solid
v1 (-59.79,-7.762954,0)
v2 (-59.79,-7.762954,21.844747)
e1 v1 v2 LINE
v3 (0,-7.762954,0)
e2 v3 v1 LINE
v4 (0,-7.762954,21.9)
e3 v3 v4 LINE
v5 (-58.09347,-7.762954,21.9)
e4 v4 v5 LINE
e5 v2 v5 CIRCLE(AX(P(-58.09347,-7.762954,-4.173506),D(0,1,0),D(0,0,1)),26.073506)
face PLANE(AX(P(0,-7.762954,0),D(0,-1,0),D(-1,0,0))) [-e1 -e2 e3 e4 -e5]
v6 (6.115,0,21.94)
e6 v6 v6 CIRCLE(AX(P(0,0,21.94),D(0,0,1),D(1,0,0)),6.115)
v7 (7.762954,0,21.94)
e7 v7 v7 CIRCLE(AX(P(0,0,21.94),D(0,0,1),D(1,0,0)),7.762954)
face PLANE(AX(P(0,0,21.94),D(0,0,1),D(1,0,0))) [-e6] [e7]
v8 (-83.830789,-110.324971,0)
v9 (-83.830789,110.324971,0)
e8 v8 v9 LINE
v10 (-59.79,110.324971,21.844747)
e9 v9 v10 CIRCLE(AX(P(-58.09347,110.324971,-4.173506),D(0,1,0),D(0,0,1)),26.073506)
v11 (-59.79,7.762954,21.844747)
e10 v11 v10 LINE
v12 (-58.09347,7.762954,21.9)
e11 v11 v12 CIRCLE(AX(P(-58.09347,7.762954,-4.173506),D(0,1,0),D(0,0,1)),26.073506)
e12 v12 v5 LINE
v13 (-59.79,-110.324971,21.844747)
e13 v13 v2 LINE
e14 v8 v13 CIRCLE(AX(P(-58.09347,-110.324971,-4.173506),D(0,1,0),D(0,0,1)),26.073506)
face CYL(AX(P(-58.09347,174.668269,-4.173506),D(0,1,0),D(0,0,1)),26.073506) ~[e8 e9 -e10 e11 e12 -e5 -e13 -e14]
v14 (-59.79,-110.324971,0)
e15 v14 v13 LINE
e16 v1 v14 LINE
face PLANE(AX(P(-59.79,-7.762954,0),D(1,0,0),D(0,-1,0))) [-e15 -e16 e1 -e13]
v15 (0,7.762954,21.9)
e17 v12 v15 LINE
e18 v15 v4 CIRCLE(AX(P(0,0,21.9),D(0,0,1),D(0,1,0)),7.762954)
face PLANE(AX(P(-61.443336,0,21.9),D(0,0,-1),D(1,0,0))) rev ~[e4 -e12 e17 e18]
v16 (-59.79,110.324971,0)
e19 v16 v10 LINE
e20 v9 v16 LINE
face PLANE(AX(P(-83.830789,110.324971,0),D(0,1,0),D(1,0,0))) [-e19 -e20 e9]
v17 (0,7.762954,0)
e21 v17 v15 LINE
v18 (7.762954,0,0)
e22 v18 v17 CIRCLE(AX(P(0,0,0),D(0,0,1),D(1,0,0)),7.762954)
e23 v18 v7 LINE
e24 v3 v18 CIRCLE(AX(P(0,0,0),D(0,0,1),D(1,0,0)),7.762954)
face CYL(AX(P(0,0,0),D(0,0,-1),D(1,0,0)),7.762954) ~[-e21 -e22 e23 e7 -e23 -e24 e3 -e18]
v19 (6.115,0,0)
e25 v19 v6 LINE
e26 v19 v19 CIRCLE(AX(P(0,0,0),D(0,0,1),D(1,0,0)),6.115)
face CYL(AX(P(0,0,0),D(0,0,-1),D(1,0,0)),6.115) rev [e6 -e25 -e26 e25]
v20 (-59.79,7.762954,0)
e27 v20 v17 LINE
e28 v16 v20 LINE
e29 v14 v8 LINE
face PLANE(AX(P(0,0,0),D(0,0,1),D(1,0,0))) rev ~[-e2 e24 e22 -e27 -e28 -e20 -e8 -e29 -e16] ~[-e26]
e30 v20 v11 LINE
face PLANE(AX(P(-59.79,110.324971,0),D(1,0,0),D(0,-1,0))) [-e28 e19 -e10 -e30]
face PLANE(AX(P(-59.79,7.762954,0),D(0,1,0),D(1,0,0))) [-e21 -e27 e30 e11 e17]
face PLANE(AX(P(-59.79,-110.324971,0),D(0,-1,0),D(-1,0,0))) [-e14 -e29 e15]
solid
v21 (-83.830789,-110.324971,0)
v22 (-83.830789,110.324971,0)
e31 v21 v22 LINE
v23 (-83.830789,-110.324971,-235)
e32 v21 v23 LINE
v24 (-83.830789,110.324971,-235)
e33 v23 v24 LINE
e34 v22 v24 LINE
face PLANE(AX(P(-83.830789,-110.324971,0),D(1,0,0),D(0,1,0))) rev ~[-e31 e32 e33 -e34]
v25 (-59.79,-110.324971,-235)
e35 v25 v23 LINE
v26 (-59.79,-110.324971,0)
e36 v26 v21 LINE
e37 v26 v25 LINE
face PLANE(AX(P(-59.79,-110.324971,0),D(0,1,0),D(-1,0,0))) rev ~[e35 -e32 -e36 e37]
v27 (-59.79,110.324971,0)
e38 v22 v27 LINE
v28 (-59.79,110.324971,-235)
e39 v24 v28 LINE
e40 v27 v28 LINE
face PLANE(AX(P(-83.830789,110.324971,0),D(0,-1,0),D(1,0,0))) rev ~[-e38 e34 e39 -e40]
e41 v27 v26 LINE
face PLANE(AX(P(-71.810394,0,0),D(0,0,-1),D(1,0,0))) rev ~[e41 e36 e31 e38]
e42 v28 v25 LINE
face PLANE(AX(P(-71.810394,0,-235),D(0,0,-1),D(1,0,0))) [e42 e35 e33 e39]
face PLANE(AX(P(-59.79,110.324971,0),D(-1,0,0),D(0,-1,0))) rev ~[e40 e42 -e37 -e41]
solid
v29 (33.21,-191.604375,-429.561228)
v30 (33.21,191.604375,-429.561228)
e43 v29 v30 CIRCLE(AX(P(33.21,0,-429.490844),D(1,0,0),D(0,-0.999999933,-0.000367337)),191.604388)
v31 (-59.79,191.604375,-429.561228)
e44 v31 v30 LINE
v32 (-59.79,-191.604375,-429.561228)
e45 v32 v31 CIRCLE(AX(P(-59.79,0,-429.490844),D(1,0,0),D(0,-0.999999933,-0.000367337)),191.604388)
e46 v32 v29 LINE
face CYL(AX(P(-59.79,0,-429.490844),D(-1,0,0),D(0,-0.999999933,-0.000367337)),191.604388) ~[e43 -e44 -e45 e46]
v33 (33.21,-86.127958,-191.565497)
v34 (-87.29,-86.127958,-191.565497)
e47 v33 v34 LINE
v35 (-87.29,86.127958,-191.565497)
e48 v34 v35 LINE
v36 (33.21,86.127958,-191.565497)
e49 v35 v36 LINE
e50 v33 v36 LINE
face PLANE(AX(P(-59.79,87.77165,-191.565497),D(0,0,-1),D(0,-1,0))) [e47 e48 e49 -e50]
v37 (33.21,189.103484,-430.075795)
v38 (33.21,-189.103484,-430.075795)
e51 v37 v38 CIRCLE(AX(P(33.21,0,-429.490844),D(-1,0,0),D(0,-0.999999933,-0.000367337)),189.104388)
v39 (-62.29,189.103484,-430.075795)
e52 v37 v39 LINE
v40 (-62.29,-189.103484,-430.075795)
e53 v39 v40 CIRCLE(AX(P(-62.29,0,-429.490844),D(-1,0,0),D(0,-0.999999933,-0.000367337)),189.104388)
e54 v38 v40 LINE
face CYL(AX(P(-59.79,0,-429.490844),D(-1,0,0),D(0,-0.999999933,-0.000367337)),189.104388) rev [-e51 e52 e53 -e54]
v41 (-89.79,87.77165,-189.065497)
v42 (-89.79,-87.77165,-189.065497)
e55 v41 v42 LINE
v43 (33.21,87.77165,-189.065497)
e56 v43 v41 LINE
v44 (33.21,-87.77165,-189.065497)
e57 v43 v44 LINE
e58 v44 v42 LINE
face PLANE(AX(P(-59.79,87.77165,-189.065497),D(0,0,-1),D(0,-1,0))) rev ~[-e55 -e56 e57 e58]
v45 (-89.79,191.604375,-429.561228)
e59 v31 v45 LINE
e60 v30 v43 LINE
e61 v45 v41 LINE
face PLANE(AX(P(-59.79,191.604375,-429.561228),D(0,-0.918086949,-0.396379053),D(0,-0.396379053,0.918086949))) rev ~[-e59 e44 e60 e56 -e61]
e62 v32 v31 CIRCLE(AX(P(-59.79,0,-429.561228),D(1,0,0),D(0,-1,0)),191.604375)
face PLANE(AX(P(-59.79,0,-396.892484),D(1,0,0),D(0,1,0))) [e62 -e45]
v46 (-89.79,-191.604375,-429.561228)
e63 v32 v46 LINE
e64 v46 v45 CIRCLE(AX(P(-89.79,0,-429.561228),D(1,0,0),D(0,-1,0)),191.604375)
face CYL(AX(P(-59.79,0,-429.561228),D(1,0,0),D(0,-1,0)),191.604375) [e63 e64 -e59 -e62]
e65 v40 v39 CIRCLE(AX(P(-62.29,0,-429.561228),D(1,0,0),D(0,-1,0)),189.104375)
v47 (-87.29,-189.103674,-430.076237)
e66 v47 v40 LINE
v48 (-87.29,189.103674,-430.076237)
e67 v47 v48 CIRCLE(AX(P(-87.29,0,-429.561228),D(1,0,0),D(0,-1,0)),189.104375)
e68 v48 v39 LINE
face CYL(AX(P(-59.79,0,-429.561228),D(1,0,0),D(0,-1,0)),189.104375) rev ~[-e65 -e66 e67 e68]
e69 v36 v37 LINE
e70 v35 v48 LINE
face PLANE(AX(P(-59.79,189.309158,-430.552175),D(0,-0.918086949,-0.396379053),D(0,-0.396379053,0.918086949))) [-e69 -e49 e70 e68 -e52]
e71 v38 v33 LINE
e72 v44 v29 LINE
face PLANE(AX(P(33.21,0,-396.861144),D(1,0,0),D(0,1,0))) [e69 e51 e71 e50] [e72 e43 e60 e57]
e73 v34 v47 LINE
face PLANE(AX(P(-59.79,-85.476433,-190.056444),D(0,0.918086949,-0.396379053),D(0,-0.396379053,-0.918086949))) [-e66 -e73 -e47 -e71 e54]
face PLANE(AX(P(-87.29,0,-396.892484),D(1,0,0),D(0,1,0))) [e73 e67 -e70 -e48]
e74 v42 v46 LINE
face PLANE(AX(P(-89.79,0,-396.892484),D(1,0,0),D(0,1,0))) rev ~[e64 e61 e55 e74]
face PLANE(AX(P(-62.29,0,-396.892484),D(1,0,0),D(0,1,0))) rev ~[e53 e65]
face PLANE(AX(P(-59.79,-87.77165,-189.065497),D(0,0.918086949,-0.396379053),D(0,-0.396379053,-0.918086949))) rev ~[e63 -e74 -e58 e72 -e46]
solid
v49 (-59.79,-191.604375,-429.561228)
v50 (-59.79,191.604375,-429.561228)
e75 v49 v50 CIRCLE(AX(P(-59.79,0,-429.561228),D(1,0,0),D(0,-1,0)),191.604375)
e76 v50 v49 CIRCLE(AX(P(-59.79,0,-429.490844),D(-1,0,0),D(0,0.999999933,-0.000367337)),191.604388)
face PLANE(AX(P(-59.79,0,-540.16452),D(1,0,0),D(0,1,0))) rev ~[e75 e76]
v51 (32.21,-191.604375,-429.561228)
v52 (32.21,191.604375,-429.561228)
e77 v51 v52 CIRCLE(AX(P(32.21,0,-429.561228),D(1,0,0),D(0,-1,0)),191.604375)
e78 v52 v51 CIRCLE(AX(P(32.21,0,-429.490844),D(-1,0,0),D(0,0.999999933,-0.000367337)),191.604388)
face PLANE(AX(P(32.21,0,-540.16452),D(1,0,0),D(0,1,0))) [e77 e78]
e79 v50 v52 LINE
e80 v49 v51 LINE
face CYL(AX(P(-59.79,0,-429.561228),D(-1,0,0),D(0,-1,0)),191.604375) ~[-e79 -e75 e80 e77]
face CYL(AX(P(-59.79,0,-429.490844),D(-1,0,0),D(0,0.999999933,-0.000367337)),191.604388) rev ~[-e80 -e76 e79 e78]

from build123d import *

# Parameters (mm, degrees)
F0_R        = 7.7629536733
F0_R_2      = 6.115
F1_DEPTH    = 21.94
F3_DEPTH    = 21.9
F4_T1_DEPTH = 349.3365371959
F7_DEPTH    = 30
F8_DEPTH    = 235
F10_DEPTH   = 93
F11_T       = -2.5
F12_DEPTH   = 92


# Not quite as in the source:
# - a fillet or chamfer that OpenCascade refuses, or shapes differently, is made with other operations: its cross-section is extruded or revolved along the edge and cut away or added


with BuildPart() as f1:
    # F0 (on Top) → F1 (new body)
    with BuildSketch(Plane.XY):
        Circle(F0_R)
        Circle(F0_R_2, mode=Mode.SUBTRACT)
    extrude(amount=F1_DEPTH)

    # F2 (on face) → F3 (join)
    with BuildSketch(Plane(origin=(0, 0, 0), x_dir=(1, 0, 0), z_dir=(0, 0, -1))):
        with BuildLine():
            ThreePointArc((0, -7.7629536733), (-7.7629536733, 0), (0, 7.7629536733))
            Line((0, 7.7629536733), (-59.79, 7.7629536733))
            Line((-59.79, 7.7629536733), (-59.79, 110.3249713778))
            Line((-59.79, 110.3249713778), (-83.8307887316, 110.3249713778))
            Line((-83.8307887316, 110.3249713778), (-83.8307887316, 0))
            Line((-83.8307887316, 0), (-83.8307887316, -110.3249713778))
            Line((-83.8307887316, -110.3249713778), (-59.79, -110.3249713778))
            Line((-59.79, -110.3249713778), (-59.79, -7.7629536733))
            Line((-59.79, -7.7629536733), (0, -7.7629536733))
        make_face()
    extrude(amount=-F3_DEPTH)

    # F4: fillet of radius 26.0735064736 on 1 edges, made by hand

    # F4_s2 → F4_t1 (cut)
    with BuildSketch(Plane.XZ.offset(-174.668268598)):
        with BuildLine():
            ThreePointArc((-58.0934698435, 21.9), (-74.9903599682, 15.6840574239), (-83.8307887316, 0))
            Line((-83.8307887316, 0), (-83.8307887316, 21.9))
            Line((-83.8307887316, 21.9), (-58.0934698435, 21.9))
        make_face()
    extrude(amount=F4_T1_DEPTH, mode=Mode.SUBTRACT)


with BuildPart() as f7:
    # F6 (on face) → F7 (new body)
    with BuildSketch(Plane.YZ.offset(-59.79)):
        with BuildLine():
            Line((-87.7716502015, -189.0654966483), (-191.6043754912, -429.56122756))
            ThreePointArc((-191.6043754912, -429.56122756), (0, -621.1656030512), (191.6043754912, -429.56122756))
            Line((191.6043754912, -429.56122756), (87.7716502015, -189.0654966483))
            Line((87.7716502015, -189.0654966483), (-87.7716502015, -189.0654966483))
        make_face()
    extrude(amount=-F7_DEPTH)

    # F9 (on face) → F10 (join)
    with BuildSketch(Plane.YZ.offset(-59.79)):
        with BuildLine():
            Line((-87.7716502015, -189.0654966483), (-191.6043754912, -429.56122756))
            ThreePointArc((-191.6043754912, -429.56122756), (0, -621.0952325876), (191.6043754912, -429.56122756))
            Line((191.6043754912, -429.56122756), (87.7716502015, -189.0654966483))
            Line((87.7716502015, -189.0654966483), (-87.7716502015, -189.0654966483))
        make_face()
    extrude(amount=F10_DEPTH)

    # F11
    f11_openings = [f7.faces().sort_by_distance(p)[0] for p in [
        (33.21, 0, -410.391358),
    ]]
    offset(amount=F11_T, openings=f11_openings, kind=Kind.INTERSECTION)


with BuildPart() as f8:
    # F5 (on face) → F8 (new body)
    with BuildSketch(Plane(origin=(0, 0, 0), x_dir=(1, 0, 0), z_dir=(0, 0, -1))):
        Polygon((-83.8307887316, 110.3249713778), (-83.8307887316, -110.3249713778), (-59.79, -110.3249713778), (-59.79, -7.7629536733), (-59.79, 7.7629536733), (-59.79, 110.3249713778), align=None)
    extrude(amount=F8_DEPTH)


with BuildPart() as f12:
    # F10_face (on face) → F12 (new body)
    with BuildSketch(Plane(origin=(-59.79, 4e-10, -580.0199905498), x_dir=(0, 1, 0), z_dir=(1, 0, 0))):
        with BuildLine():
            ThreePointArc((-191.6043754916, 150.4587629897), (-4e-10, -41.1456125014), (191.6043754908, 150.4587629897))
            ThreePointArc((191.6043754908, 150.4587629897), (-4e-10, -41.0752420379), (-191.6043754916, 150.4587629897))
        make_face()
    extrude(amount=F12_DEPTH)


solid = Compound([f1.part, f7.part, f8.part, f12.part])
